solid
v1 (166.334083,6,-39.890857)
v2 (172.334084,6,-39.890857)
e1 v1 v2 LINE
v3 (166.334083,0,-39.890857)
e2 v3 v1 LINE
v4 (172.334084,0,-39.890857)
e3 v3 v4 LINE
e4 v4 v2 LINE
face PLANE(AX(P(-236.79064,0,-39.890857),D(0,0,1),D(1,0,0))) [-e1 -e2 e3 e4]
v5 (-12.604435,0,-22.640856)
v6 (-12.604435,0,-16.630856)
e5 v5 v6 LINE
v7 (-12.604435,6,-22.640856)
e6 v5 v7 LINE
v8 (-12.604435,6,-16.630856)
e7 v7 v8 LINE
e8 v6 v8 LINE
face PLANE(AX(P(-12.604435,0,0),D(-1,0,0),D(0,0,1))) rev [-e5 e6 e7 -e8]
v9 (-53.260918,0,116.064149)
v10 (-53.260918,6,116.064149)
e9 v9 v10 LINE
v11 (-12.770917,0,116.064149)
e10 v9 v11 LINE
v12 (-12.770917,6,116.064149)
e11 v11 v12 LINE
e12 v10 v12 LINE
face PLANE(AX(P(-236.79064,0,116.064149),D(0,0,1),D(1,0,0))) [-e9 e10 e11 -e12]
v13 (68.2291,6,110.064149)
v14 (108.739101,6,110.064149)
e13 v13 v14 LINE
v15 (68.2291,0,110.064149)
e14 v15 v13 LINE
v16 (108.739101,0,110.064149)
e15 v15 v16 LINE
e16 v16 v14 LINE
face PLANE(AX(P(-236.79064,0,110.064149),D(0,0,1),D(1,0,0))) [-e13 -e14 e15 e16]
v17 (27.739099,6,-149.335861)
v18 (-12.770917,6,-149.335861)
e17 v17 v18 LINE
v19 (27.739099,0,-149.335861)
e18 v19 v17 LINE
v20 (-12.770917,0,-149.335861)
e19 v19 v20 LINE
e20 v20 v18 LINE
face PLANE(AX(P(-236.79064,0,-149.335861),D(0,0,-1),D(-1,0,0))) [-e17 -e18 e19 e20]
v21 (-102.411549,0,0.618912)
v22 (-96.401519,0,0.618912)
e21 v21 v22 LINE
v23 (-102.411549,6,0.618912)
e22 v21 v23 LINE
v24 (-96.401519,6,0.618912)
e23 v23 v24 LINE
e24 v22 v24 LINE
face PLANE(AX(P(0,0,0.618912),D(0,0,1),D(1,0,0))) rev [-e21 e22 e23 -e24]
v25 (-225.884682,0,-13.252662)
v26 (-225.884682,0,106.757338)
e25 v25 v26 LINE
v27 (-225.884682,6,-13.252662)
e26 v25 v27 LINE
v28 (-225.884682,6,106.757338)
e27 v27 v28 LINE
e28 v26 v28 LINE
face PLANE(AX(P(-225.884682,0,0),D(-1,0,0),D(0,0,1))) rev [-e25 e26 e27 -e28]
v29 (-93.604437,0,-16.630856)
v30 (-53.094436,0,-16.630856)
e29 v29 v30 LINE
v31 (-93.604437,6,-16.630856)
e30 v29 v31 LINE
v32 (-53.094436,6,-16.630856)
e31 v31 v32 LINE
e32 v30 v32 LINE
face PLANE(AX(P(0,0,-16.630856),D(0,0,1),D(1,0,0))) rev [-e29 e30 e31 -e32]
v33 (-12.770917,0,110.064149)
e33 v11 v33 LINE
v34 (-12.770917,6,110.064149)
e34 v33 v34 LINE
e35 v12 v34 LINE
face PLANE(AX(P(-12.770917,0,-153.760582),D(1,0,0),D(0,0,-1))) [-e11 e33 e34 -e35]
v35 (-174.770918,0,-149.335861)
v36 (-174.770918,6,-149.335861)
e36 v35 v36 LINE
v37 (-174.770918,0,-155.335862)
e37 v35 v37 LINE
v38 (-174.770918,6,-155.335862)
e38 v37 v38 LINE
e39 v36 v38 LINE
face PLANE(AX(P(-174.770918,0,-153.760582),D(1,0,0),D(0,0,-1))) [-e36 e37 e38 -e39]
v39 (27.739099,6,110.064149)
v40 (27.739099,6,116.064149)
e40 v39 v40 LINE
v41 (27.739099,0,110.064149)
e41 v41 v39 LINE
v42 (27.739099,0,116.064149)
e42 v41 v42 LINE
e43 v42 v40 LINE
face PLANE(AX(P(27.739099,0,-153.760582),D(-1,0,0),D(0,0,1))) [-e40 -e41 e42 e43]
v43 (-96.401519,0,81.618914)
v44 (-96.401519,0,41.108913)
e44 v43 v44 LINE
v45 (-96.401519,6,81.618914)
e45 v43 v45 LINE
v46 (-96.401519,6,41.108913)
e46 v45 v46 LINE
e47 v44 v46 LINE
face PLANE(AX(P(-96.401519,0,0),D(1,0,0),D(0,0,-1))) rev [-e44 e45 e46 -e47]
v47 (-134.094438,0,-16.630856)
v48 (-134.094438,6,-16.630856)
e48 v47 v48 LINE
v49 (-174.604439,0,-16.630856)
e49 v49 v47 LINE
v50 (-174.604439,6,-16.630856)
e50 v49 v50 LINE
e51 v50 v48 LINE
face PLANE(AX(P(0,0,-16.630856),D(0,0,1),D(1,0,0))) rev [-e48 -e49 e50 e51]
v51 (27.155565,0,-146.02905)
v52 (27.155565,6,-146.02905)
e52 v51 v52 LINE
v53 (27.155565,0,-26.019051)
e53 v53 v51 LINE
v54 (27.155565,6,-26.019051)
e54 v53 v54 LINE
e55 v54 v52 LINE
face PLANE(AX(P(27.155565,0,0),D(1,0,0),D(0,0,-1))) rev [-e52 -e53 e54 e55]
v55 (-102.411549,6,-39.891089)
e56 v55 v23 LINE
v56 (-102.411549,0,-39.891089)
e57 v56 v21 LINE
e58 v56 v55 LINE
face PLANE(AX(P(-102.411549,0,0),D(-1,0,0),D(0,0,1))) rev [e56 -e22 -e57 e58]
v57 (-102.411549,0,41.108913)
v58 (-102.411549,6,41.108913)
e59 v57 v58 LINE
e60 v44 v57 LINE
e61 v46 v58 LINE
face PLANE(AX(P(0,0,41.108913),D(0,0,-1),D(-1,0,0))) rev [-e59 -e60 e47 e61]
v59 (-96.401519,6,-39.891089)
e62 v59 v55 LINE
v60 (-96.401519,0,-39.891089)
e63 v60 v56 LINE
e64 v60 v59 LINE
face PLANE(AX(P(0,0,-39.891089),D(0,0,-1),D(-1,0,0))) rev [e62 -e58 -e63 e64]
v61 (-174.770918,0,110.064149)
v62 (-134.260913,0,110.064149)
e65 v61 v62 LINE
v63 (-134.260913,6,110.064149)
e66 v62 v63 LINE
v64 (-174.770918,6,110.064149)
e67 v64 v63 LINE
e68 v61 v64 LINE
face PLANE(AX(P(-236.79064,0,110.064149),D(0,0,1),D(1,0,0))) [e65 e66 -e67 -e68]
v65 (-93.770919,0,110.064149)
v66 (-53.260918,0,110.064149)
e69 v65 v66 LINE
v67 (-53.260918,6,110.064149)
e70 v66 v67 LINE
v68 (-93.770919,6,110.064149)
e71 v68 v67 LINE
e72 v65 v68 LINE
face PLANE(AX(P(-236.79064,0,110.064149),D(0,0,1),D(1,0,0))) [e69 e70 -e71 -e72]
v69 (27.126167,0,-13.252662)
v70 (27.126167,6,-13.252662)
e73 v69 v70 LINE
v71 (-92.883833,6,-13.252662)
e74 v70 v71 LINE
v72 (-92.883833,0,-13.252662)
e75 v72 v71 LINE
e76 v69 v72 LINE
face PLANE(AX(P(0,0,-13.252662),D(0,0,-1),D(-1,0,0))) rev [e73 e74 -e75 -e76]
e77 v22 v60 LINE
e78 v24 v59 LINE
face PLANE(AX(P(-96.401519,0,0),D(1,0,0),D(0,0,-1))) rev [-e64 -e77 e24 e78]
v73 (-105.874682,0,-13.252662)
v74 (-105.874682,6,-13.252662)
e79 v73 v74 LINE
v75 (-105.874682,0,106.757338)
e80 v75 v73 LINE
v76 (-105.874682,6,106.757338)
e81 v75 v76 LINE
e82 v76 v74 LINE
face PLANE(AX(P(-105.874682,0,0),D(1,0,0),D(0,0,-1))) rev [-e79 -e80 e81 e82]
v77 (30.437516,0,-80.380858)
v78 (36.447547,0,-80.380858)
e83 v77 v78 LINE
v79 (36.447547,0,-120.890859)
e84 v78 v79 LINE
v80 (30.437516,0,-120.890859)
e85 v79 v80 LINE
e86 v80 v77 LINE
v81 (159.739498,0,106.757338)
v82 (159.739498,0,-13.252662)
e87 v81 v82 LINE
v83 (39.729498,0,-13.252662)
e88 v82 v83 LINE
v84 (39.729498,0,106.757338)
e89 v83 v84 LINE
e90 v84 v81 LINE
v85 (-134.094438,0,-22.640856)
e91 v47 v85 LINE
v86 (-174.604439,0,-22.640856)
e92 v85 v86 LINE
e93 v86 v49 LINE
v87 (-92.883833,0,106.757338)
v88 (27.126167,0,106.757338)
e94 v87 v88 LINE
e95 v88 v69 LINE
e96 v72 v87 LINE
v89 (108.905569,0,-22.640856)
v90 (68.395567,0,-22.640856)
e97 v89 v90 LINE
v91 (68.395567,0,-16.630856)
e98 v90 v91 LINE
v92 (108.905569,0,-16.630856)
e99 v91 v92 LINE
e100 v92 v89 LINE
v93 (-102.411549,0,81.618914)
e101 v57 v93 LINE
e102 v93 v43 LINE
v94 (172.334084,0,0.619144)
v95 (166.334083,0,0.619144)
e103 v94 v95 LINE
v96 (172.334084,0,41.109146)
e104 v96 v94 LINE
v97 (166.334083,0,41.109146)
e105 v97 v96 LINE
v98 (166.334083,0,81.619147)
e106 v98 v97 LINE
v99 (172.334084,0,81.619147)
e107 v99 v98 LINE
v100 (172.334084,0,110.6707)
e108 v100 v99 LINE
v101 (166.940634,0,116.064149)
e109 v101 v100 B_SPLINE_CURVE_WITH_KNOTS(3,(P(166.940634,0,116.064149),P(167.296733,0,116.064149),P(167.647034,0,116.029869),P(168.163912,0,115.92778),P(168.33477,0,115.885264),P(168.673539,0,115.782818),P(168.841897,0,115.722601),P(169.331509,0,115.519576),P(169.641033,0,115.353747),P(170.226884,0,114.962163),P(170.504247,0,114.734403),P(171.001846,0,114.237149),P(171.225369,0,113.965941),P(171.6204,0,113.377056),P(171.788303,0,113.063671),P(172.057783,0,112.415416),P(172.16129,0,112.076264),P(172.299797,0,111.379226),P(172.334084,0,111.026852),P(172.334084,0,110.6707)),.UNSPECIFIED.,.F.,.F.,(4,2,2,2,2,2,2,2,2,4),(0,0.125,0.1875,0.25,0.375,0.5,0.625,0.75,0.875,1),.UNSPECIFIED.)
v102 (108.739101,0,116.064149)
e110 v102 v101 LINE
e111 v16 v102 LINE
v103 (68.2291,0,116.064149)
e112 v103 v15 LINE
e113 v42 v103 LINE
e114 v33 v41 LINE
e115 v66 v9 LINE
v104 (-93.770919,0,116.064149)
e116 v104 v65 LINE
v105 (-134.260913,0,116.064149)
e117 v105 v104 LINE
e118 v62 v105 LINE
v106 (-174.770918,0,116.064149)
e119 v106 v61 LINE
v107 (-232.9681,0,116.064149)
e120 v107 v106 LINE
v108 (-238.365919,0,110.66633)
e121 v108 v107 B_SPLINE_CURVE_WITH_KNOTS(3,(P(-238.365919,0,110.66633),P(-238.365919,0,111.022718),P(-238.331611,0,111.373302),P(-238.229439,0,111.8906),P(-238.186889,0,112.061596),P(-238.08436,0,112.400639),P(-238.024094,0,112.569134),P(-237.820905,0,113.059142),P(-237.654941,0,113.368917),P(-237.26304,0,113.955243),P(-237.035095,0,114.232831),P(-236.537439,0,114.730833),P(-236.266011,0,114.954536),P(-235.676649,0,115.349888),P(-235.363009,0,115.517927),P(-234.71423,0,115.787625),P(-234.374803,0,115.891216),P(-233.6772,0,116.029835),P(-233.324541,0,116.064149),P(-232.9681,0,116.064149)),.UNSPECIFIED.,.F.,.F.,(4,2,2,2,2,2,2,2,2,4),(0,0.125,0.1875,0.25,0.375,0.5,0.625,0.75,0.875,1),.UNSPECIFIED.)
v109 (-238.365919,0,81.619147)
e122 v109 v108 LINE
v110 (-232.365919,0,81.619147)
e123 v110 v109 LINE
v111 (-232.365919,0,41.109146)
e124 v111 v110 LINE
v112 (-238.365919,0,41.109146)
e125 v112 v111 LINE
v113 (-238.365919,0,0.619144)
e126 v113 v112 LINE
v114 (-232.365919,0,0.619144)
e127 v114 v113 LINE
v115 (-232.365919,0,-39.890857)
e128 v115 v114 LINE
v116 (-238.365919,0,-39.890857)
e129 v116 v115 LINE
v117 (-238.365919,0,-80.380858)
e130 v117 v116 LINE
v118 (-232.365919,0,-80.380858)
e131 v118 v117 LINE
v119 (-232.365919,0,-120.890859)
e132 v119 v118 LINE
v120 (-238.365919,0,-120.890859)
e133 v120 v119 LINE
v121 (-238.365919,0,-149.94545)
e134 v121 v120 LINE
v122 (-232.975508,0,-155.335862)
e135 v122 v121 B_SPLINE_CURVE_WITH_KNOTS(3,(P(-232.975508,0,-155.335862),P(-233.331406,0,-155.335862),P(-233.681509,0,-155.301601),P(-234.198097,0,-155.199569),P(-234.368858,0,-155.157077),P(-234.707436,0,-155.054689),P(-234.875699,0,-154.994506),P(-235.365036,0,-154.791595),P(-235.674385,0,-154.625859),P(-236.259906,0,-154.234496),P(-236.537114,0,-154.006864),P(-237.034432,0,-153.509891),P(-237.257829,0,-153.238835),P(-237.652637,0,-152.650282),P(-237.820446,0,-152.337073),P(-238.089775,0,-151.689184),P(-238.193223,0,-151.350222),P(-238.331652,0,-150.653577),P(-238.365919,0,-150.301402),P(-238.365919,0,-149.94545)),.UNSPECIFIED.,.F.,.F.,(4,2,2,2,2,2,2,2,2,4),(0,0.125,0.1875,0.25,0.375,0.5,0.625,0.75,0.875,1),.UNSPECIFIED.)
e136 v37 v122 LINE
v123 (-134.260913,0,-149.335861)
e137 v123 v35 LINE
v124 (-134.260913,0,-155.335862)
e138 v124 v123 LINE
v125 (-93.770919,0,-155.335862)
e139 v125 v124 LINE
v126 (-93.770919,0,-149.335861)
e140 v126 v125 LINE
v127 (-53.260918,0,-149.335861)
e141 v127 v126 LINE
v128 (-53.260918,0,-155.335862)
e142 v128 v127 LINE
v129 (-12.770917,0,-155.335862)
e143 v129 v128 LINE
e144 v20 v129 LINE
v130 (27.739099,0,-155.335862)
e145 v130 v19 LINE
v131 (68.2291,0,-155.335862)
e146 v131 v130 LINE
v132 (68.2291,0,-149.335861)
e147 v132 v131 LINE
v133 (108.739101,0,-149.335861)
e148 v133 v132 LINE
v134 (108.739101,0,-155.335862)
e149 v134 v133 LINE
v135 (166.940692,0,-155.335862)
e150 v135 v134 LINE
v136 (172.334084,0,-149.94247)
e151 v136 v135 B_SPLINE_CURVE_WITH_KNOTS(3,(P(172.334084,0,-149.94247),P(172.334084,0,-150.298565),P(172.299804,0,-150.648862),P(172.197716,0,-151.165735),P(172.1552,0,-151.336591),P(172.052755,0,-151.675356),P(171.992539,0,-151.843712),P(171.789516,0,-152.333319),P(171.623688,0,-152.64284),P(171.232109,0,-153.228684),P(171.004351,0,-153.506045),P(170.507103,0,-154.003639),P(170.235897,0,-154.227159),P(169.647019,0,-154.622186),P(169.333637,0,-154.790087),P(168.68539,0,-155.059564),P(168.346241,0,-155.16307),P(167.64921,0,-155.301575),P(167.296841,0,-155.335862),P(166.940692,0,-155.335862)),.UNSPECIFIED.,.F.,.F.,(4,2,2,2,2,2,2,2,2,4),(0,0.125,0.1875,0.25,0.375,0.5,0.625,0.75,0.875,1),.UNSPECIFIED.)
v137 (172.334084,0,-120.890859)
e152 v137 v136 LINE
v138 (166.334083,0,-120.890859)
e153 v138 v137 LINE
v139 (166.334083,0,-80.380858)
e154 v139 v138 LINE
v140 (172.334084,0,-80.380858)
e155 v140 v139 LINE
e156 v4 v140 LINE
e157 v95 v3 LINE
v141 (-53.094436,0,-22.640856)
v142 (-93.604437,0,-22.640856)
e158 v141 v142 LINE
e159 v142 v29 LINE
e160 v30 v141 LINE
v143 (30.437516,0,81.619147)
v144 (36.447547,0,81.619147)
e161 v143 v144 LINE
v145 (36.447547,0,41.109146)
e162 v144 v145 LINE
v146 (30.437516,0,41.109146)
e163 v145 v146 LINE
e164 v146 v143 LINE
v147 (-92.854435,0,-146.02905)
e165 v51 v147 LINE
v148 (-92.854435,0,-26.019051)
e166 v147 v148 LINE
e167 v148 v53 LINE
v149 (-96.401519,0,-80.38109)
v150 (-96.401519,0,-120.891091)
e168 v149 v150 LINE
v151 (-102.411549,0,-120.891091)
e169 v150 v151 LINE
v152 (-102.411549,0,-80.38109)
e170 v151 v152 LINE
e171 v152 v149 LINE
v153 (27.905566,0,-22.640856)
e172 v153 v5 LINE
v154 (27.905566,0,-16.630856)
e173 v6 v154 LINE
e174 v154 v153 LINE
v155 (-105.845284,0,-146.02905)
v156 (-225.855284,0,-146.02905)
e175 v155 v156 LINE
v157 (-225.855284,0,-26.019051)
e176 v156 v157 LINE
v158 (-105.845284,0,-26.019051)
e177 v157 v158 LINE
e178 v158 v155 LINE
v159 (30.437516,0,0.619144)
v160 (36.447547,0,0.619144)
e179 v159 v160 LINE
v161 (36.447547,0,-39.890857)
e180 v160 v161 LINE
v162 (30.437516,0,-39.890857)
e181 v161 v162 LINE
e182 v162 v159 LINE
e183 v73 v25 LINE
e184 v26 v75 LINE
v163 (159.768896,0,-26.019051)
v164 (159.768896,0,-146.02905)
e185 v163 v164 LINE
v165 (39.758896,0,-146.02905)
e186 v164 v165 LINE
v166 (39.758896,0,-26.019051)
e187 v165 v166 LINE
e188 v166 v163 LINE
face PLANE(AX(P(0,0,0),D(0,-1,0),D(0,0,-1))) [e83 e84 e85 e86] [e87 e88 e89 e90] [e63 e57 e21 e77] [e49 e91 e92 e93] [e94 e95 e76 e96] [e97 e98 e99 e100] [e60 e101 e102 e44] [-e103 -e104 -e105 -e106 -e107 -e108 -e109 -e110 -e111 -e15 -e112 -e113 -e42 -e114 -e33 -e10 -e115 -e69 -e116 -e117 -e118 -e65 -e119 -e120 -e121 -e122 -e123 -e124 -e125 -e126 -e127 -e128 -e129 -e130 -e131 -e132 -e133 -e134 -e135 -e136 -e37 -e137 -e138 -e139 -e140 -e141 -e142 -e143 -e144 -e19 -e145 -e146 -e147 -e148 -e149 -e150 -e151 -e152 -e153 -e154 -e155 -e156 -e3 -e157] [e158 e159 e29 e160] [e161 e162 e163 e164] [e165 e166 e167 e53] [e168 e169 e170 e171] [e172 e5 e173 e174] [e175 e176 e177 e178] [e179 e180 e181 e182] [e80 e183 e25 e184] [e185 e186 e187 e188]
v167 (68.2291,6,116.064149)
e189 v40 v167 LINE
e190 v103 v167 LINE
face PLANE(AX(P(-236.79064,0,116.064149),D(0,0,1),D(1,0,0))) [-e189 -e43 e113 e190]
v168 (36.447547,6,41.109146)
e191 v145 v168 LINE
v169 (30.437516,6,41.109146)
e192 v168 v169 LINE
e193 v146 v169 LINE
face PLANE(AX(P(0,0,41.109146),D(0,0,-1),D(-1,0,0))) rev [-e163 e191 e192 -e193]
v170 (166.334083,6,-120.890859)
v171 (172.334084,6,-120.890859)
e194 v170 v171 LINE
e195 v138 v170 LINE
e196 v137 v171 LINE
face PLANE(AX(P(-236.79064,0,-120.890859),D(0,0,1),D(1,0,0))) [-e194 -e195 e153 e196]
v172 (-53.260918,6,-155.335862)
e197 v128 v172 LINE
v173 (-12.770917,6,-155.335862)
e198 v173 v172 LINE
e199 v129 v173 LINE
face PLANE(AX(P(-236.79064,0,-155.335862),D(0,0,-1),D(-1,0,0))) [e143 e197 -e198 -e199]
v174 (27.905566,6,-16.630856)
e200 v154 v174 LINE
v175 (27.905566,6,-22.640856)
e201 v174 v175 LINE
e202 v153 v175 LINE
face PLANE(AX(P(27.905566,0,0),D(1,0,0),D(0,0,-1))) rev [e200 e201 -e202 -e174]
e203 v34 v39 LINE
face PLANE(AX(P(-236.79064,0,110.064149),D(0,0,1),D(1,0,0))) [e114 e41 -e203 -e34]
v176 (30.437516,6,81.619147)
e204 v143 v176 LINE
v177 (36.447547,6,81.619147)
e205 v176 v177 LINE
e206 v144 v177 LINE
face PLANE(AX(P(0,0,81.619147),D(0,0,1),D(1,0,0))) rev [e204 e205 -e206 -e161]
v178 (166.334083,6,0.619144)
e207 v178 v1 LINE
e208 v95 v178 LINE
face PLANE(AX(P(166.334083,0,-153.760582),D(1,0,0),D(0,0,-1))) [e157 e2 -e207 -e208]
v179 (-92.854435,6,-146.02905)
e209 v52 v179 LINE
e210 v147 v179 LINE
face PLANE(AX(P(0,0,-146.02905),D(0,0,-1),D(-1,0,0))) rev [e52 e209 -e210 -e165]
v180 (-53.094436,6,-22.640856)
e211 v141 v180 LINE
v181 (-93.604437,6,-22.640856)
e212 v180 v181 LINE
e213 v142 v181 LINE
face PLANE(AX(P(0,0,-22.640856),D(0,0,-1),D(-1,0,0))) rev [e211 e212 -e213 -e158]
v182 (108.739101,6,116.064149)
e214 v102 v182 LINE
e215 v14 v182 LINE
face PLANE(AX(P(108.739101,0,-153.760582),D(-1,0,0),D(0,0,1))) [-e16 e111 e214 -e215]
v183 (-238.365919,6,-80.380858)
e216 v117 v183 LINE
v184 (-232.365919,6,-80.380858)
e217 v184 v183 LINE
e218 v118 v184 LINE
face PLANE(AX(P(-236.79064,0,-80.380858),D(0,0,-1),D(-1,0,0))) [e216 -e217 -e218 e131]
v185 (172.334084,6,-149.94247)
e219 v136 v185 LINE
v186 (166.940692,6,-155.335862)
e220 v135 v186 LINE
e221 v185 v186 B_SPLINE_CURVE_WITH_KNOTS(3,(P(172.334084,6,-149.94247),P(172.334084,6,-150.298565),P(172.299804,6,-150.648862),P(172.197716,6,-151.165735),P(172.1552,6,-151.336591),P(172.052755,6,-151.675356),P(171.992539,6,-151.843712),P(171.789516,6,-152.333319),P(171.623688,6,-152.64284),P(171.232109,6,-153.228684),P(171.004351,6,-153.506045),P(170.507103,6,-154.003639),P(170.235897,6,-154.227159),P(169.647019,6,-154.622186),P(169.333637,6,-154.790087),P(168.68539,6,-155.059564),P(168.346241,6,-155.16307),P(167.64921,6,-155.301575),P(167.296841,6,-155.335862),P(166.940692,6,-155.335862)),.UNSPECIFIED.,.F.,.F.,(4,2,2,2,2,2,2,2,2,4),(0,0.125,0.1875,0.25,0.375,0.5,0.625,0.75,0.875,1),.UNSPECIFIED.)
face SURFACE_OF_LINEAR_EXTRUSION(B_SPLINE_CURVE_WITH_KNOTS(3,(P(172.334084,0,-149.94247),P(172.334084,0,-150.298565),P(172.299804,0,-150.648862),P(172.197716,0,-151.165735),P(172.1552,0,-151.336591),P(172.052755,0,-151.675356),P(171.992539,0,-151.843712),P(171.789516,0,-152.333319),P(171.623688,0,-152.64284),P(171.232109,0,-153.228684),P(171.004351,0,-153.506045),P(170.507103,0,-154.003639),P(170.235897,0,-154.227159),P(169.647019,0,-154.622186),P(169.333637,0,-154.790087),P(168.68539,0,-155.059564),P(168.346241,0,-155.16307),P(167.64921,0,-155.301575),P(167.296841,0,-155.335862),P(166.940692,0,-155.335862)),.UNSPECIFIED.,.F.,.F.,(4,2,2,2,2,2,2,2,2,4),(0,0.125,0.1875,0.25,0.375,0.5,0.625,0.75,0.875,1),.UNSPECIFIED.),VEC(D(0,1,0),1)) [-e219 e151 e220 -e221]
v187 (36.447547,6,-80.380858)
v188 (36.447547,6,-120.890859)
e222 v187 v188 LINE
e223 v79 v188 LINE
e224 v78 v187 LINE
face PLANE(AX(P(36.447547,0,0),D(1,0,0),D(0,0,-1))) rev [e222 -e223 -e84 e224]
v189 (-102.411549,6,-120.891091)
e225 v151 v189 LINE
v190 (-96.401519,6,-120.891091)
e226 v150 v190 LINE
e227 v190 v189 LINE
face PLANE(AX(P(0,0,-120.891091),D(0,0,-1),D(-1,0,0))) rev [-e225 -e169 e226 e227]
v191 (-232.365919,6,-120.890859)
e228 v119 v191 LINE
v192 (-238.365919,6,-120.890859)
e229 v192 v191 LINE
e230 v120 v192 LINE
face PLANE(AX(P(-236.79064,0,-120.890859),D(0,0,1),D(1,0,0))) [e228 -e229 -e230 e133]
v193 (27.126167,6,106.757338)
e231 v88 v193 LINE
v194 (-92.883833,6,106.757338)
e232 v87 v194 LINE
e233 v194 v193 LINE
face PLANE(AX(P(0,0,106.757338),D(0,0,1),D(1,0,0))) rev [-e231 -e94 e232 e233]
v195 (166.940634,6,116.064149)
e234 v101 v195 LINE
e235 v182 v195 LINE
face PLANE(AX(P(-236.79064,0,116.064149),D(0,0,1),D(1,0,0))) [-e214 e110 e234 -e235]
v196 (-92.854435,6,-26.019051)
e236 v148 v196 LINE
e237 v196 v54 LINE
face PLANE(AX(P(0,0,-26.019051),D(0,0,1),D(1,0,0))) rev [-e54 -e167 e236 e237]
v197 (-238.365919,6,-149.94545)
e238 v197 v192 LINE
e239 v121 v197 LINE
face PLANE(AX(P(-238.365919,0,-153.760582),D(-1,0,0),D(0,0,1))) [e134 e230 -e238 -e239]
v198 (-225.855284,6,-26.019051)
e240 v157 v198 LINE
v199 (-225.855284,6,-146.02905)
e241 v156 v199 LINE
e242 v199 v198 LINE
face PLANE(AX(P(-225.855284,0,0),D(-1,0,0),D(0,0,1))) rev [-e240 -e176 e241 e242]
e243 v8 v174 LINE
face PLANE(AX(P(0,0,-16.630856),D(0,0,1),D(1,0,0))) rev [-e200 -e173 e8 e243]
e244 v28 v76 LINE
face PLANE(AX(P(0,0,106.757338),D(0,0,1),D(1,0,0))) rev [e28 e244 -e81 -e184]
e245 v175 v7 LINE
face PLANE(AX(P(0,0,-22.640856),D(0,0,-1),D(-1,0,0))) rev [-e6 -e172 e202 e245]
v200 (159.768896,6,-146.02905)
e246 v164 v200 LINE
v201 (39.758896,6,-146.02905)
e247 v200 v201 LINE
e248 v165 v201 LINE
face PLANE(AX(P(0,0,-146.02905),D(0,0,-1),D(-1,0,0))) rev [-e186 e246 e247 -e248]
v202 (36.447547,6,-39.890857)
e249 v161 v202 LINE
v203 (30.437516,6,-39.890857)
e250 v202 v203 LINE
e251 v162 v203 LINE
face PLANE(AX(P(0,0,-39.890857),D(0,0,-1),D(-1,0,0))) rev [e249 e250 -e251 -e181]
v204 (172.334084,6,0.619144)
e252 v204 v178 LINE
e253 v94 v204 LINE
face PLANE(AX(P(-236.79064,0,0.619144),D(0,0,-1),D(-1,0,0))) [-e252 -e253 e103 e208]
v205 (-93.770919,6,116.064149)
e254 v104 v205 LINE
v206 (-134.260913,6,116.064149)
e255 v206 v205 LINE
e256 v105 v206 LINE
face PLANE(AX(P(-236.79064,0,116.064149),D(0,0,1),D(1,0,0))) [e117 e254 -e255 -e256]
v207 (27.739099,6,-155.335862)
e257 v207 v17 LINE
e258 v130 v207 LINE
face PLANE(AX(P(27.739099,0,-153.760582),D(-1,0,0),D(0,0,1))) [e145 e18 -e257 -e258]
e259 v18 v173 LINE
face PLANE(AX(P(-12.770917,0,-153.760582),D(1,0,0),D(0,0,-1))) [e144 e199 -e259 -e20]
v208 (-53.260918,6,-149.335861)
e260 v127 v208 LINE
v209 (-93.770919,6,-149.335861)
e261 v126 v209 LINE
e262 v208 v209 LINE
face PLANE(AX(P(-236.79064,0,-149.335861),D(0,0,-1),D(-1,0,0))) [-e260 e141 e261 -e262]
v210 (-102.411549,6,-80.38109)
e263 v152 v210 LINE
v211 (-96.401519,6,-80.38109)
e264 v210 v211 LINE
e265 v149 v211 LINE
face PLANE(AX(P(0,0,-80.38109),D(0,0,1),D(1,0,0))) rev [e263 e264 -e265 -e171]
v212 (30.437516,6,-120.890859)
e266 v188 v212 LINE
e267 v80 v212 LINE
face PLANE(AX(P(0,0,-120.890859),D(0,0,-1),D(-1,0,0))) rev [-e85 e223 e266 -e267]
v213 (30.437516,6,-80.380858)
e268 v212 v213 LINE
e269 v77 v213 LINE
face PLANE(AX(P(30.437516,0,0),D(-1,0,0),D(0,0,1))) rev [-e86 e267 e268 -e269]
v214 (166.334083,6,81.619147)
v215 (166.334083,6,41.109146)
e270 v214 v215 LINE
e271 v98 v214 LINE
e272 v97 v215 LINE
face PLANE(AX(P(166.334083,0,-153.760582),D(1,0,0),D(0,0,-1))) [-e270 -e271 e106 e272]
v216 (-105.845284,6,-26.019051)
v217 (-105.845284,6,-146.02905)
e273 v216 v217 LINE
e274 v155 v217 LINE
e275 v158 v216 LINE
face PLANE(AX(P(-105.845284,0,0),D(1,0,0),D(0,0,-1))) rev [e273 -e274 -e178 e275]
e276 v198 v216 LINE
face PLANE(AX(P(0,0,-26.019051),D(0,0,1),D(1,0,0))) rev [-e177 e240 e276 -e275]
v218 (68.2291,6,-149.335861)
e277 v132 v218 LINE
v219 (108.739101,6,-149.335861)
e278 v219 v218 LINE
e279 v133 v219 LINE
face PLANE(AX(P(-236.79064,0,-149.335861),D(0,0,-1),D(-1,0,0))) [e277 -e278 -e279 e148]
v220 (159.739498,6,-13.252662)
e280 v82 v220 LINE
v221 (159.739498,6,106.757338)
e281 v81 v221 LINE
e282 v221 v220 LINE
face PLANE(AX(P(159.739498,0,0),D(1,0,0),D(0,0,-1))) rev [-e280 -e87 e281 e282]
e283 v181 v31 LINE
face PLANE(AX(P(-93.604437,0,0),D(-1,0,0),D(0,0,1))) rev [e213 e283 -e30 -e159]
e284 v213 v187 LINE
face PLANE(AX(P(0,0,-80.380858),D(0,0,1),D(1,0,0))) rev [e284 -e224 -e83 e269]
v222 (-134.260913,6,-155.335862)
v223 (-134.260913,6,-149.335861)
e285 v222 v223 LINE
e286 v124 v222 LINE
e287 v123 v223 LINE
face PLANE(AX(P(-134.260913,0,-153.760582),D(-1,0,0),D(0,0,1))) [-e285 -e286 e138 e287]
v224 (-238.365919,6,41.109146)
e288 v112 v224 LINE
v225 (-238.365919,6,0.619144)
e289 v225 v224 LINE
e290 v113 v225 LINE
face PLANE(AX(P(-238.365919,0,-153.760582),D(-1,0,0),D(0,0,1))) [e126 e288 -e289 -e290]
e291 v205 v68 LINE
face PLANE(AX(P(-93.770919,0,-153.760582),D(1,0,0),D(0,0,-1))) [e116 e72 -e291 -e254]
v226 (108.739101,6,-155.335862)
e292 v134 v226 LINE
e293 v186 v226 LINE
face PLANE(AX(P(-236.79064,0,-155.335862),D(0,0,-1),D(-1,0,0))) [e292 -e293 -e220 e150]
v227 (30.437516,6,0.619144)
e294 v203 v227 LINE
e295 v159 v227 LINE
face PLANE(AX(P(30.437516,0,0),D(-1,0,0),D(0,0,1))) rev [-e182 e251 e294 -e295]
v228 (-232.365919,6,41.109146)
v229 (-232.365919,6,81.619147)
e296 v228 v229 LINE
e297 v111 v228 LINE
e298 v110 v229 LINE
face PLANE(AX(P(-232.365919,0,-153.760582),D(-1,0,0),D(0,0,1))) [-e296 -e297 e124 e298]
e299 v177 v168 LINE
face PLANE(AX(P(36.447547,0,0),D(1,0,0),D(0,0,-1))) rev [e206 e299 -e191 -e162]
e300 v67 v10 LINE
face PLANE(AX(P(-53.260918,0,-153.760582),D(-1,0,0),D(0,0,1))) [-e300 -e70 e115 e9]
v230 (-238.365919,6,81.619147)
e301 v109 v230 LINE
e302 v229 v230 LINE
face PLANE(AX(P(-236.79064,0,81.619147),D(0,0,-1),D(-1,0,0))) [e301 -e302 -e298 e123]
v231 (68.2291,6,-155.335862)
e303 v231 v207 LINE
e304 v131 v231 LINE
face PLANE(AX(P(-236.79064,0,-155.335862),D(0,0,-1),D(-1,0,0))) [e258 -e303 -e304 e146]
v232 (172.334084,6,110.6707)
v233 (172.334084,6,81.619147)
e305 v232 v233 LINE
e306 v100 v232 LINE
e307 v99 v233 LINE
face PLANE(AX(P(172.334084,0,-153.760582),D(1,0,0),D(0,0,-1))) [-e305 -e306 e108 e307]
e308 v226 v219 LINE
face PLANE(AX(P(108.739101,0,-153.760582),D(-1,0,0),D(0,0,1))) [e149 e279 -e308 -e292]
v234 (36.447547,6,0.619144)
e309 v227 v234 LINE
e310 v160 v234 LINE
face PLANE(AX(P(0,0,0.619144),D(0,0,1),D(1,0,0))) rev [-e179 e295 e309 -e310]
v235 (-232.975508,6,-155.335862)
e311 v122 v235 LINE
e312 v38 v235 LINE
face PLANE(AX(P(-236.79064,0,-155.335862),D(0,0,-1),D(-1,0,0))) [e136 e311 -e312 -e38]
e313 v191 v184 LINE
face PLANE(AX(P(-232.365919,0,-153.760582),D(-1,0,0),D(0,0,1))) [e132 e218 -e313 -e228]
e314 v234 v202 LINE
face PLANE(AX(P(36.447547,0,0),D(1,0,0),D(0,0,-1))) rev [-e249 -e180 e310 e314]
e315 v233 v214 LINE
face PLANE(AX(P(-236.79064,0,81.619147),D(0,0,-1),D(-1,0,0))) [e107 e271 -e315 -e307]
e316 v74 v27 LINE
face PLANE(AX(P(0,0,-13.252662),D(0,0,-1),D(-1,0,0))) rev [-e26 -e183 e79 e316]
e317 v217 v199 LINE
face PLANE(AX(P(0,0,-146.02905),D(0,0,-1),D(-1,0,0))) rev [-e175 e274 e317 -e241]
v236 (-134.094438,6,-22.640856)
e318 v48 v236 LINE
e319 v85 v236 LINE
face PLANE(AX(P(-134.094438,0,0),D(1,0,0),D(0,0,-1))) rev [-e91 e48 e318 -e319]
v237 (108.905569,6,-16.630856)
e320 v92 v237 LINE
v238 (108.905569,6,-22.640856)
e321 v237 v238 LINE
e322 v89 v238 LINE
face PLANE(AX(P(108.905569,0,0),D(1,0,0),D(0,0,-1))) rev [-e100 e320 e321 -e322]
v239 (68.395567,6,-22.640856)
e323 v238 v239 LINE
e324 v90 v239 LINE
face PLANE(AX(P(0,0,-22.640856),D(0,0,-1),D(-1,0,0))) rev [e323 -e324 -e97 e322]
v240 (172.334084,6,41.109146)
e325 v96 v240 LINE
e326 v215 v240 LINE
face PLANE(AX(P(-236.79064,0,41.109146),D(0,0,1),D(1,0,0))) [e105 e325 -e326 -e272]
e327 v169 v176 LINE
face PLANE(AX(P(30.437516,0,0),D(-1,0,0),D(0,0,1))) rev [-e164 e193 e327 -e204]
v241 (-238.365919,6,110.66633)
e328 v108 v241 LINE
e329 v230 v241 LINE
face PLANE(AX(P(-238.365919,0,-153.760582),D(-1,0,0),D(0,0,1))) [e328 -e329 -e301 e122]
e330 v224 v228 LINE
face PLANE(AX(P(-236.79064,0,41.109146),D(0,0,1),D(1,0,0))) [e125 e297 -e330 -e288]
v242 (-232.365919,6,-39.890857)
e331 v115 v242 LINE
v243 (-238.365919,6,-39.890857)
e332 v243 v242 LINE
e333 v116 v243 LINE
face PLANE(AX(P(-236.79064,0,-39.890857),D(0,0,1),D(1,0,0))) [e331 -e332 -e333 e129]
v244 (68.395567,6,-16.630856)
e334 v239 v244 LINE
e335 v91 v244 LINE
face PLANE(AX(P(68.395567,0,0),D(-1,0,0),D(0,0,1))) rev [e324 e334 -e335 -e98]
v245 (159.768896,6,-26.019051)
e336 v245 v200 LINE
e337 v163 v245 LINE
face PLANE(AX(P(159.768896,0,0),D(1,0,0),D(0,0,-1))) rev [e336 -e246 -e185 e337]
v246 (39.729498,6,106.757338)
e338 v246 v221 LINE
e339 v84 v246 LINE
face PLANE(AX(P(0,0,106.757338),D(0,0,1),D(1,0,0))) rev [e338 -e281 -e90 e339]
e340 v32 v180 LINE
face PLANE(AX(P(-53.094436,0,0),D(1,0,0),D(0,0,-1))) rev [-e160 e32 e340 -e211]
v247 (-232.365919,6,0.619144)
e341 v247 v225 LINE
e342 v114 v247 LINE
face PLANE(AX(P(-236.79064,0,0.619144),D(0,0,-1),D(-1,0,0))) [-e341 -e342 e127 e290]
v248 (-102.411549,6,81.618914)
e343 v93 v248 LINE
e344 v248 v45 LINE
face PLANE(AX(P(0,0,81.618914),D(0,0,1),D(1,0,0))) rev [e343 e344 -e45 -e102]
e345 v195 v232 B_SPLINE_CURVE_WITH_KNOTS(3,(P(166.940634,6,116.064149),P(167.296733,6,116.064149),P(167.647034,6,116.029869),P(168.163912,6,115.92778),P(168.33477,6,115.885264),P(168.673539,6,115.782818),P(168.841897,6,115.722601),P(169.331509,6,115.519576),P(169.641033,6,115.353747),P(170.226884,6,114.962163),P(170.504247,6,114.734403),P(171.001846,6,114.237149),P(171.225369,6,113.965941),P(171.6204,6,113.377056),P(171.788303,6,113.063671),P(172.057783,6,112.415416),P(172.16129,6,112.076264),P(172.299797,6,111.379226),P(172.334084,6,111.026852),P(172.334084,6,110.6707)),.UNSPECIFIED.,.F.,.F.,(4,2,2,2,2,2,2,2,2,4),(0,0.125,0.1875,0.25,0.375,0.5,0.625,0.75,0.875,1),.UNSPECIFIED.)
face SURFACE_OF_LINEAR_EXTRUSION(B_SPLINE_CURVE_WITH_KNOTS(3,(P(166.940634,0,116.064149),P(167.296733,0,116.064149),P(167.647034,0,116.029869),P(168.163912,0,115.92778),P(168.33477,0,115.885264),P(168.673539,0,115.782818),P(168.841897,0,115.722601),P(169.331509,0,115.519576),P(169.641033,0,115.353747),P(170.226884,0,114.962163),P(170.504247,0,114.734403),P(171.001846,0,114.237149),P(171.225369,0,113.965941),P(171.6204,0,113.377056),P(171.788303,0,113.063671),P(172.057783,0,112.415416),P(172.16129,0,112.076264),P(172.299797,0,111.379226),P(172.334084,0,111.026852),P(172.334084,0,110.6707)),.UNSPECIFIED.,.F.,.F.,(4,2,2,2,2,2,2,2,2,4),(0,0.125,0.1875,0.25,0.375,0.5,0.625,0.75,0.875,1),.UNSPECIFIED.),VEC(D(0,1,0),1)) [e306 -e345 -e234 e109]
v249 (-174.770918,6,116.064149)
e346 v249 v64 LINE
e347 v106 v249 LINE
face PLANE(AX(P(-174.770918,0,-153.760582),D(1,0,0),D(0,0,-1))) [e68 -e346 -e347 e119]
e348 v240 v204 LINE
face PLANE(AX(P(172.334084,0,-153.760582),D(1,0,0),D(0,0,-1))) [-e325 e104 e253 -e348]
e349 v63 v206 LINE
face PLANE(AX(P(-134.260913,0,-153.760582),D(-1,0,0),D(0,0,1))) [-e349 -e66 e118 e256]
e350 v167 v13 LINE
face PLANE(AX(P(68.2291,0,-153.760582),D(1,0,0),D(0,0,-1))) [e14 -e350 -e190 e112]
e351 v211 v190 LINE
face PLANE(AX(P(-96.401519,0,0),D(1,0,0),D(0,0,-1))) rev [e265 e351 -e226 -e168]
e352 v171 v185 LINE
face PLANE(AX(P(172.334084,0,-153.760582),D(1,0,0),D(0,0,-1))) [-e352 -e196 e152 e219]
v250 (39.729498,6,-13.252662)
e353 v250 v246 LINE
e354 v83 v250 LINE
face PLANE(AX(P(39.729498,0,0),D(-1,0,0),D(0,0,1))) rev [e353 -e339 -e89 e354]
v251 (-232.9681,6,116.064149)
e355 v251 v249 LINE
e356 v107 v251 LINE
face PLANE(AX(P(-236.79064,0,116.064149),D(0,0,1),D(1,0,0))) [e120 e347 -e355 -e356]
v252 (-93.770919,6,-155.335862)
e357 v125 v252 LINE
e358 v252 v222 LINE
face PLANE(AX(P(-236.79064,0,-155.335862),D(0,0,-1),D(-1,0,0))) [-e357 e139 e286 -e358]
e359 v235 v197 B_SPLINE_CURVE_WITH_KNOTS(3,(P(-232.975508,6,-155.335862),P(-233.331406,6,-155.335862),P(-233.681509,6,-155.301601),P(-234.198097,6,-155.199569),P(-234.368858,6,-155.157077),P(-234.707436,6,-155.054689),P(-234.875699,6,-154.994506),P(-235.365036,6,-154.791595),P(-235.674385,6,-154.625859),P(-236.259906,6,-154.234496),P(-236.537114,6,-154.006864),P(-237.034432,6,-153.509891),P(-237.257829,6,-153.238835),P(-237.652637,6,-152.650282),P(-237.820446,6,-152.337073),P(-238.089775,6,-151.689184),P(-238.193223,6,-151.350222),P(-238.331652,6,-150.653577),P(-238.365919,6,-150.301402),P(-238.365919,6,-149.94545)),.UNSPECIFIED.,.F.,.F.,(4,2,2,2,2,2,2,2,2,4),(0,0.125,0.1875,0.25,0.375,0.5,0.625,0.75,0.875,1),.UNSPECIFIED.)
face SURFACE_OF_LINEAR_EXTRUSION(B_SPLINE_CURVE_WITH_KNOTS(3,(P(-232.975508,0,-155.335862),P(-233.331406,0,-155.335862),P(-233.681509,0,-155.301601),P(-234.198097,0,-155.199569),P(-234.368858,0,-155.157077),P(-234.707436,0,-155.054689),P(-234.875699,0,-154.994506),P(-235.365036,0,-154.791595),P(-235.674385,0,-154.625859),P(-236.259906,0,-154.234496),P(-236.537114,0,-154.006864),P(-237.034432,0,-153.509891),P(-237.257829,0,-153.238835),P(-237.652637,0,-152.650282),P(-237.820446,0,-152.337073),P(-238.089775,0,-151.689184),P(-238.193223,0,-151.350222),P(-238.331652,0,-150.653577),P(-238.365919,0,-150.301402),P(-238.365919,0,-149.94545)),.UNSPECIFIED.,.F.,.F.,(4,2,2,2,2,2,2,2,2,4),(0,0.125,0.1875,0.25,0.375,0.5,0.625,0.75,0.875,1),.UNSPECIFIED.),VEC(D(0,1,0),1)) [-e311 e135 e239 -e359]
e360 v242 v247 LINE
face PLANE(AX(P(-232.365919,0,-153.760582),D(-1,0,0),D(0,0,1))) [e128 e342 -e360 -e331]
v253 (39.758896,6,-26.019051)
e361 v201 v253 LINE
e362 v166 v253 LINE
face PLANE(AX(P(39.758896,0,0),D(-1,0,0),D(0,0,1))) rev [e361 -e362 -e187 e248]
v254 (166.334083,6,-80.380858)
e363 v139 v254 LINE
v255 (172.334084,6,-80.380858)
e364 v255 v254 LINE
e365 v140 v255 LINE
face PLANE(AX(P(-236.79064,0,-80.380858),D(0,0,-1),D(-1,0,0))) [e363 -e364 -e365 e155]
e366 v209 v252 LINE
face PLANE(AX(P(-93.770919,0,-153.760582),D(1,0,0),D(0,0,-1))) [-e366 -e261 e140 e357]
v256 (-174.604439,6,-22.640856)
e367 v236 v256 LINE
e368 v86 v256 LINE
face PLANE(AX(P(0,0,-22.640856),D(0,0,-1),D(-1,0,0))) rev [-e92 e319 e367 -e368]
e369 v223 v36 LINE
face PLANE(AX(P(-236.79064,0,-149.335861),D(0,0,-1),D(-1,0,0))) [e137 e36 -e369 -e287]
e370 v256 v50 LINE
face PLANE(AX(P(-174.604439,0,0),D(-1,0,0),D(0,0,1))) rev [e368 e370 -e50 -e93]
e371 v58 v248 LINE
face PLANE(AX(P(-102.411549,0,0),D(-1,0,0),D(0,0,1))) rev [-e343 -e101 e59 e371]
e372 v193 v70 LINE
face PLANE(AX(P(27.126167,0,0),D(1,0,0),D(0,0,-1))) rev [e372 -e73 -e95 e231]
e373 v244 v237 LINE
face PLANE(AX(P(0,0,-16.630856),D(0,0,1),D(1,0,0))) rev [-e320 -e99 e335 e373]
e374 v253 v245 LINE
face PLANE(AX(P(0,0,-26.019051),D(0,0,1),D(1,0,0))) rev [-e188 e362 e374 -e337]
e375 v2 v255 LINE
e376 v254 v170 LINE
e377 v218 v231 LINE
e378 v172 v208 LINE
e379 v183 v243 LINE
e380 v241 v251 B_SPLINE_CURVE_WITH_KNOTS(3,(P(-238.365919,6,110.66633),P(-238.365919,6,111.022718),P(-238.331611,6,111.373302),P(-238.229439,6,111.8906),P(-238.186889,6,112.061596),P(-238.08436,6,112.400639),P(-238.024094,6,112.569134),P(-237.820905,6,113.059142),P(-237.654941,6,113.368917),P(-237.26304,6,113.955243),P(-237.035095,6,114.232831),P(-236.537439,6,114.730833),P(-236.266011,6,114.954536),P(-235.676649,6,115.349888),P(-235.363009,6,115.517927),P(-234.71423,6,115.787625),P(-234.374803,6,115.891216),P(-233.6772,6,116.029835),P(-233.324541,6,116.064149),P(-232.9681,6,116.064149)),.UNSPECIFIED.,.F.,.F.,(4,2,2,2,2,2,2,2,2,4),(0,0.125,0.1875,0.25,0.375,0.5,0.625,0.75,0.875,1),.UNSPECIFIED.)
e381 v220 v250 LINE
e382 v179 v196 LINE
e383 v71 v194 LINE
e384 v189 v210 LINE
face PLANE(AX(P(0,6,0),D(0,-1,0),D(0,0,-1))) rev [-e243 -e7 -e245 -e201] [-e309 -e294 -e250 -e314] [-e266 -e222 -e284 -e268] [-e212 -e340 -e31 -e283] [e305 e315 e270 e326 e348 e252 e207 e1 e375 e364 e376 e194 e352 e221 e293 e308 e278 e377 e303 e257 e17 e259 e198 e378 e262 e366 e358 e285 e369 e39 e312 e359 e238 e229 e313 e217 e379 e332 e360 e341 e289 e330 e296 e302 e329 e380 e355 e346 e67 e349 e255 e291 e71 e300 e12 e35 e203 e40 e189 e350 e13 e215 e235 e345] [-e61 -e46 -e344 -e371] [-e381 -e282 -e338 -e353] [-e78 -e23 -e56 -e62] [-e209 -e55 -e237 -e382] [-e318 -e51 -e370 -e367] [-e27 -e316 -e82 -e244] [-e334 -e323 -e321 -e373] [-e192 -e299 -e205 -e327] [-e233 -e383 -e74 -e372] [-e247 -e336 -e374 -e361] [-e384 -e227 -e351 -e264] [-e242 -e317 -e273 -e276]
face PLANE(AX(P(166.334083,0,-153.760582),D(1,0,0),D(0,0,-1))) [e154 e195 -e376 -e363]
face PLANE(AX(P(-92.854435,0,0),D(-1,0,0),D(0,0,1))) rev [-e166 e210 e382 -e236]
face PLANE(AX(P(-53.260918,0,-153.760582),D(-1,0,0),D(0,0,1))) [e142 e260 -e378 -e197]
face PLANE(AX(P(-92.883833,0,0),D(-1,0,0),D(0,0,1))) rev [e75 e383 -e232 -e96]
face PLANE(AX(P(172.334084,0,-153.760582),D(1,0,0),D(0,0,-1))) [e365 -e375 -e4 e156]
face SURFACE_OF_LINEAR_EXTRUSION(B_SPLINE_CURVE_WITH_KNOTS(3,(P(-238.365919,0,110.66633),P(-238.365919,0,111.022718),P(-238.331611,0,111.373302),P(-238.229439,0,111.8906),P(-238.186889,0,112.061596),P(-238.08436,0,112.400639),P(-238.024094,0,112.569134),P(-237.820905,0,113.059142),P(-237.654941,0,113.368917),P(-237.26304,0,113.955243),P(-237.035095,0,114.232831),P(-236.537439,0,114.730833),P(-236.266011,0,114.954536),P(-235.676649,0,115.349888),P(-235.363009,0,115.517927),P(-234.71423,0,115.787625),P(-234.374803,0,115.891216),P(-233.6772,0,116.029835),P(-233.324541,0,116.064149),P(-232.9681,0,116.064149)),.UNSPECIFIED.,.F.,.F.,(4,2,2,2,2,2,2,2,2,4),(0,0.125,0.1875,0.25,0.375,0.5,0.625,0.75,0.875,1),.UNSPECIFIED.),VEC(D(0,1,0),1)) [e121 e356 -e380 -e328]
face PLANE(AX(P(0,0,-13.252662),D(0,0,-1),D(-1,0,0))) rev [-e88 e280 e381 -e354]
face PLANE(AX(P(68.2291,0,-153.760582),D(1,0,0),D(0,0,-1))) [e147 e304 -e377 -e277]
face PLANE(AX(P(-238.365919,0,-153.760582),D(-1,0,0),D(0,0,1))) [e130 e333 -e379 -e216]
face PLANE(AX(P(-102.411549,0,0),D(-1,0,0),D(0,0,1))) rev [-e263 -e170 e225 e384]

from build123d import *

# Parameters (mm, degrees)
SKETCH1_W                     = 600
SKETCH1_H                     = 400
BOSS_EXTRUDE1_DEPTH           = 6
CUT_EXTRUDE_THIN1_START       = -6
CUT_EXTRUDE_THIN1_OUTLINE_W   = 600
CUT_EXTRUDE_THIN1_OUTLINE_H   = 400
CUT_EXTRUDE_THIN1_OUTLINE_W_2 = 120.00999997
CUT_EXTRUDE_THIN1_OUTLINE_H_2 = 120.00999997
CUT_EXTRUDE_THIN1_OUTLINE_W_3 = 6.010030683
CUT_EXTRUDE_THIN1_OUTLINE_H_3 = 40.510001116
CUT_EXTRUDE_THIN1_OUTLINE_H_4 = 40.510001117
CUT_EXTRUDE_THIN1_OUTLINE_W_4 = 40.510001117
CUT_EXTRUDE_THIN1_OUTLINE_H_5 = 6.010000165
CUT_EXTRUDE_THIN1_OUTLINE_W_5 = 40.510001116
CUT_EXTRUDE_THIN1_DEPTH       = 6


# Read off the part's stored shape, not the designer's step: Cut-Extrude-Thin1
with BuildPart() as part:
    # Sketch1 → Boss-Extrude1 (new body)
    with BuildSketch(Plane(origin=(0, 0, 0), x_dir=(1, 0, 0), z_dir=(0, 1, 0))):
        Rectangle(SKETCH1_W, SKETCH1_H)
    extrude(amount=BOSS_EXTRUDE1_DEPTH)

    # Cut-Extrude-Thin1 outline → Cut-Extrude-Thin1 (cut)
    # profile 1 of 17: a face of its own
    with BuildSketch(Plane(origin=(0, 6, 0), x_dir=(1, 0, 0), z_dir=(0, 1, 0)).offset(CUT_EXTRUDE_THIN1_START)):
        Rectangle(CUT_EXTRUDE_THIN1_OUTLINE_W, CUT_EXTRUDE_THIN1_OUTLINE_H)
        with BuildLine():
            add(Edge.make_bspline(
                [(-238.36591917, -110.666330439), (-238.36591917, -111.022718254), (-238.331611138, -111.373302275), (-238.229439172, -111.890599849), (-238.186888618, -112.061595598), (-238.084359635, -112.40063887), (-238.024094249, -112.569133555), (-237.820904778, -113.059142484), (-237.654940907, -113.36891683), (-237.263040055, -113.955242515), (-237.035095444, -114.232830805), (-236.537438909, -114.730832851), (-236.266010557, -114.954536306), (-235.676648855, -115.349887512), (-235.363009478, -115.517926842), (-234.714230084, -115.787625448), (-234.374802575, -115.891216057), (-233.677199742, -116.029834842), (-233.324541074, -116.06414949), (-232.96810012, -116.06414949)],
                knots=[0, 0, 0, 0, 0.125, 0.125, 0.1875, 0.1875, 0.25, 0.25, 0.375, 0.375, 0.5, 0.5, 0.625, 0.625, 0.75, 0.75, 0.875, 0.875, 1, 1, 1, 1], degree=3))
            Line((-238.36591917, -110.666330439), (-238.36591917, -81.619146709))
            Line((-238.36591917, -81.619146709), (-232.365919004, -81.619146709))
            Line((-232.365919004, -81.619146709), (-232.365919004, -41.109145592))
            Line((-232.365919004, -41.109145592), (-238.36591917, -41.109145592))
            Line((-238.36591917, -41.109145592), (-238.36591917, -0.619144476))
            Line((-238.36591917, -0.619144476), (-232.365919004, -0.619144476))
            Line((-232.365919004, -0.619144476), (-232.365919004, 39.890856641))
            Line((-232.365919004, 39.890856641), (-238.36591917, 39.890856641))
            Line((-238.36591917, 39.890856641), (-238.36591917, 80.380857757))
            Line((-238.36591917, 80.380857757), (-232.365919004, 80.380857757))
            Line((-232.365919004, 80.380857757), (-232.365919004, 120.890858873))
            Line((-232.365919004, 120.890858873), (-238.36591917, 120.890858873))
            Line((-238.36591917, 120.890858873), (-238.36591917, 149.945450012))
            add(Edge.make_bspline(
                [(-232.975507527, 155.335861654), (-233.331406272, 155.335861654), (-233.681509188, 155.301600704), (-234.198096877, 155.199568948), (-234.368857969, 155.157076787), (-234.707435973, 155.054688504), (-234.875699433, 154.99450582), (-235.365035925, 154.791595185), (-235.674385168, 154.625859065), (-236.259906241, 154.234496016), (-236.537113597, 154.006864213), (-237.034432237, 153.50989061), (-237.257828705, 153.238834738), (-237.652637373, 152.650281815), (-237.820446103, 152.337072845), (-238.089774603, 151.689183769), (-238.193223055, 151.350222055), (-238.331651613, 150.653576539), (-238.36591917, 150.301401824), (-238.36591917, 149.945450012)],
                knots=[0, 0, 0, 0, 0.125, 0.125, 0.1875, 0.1875, 0.25, 0.25, 0.375, 0.375, 0.5, 0.5, 0.625, 0.625, 0.75, 0.75, 0.875, 0.875, 1, 1, 1, 1], degree=3))
            Line((-232.975507527, 155.335861654), (-174.770917874, 155.335861654))
            Line((-174.770917874, 155.335861654), (-174.770917874, 149.335861489))
            Line((-174.770917874, 149.335861489), (-134.260912943, 149.335861489))
            Line((-134.260912943, 149.335861489), (-134.260912943, 155.335861654))
            Line((-134.260912943, 155.335861654), (-93.770919456, 155.335861654))
            Line((-93.770919456, 155.335861654), (-93.770919456, 149.335861489))
            Line((-93.770919456, 149.335861489), (-53.26091834, 149.335861489))
            Line((-53.26091834, 149.335861489), (-53.26091834, 155.335861654))
            Line((-53.26091834, 155.335861654), (-12.770917223, 155.335861654))
            Line((-12.770917223, 155.335861654), (-12.770917223, 149.335861489))
            Line((-12.770917223, 149.335861489), (27.739099152, 149.335861489))
            Line((27.739099152, 149.335861489), (27.739099152, 155.335861654))
            Line((27.739099152, 155.335861654), (68.229100268, 155.335861654))
            Line((68.229100268, 155.335861654), (68.229100268, 149.335861489))
            Line((68.229100268, 149.335861489), (108.739101385, 149.335861489))
            Line((108.739101385, 149.335861489), (108.739101385, 155.335861654))
            Line((108.739101385, 155.335861654), (166.94069191, 155.335861654))
            add(Edge.make_bspline(
                [(172.334083607, 149.942469958), (172.334083607, 150.298565459), (172.299803715, 150.648861927), (172.197715552, 151.165735208), (172.155199899, 151.336590704), (172.052755011, 151.675355888), (171.992539056, 151.843712372), (171.789516243, 152.33331939), (171.623688497, 152.642839656), (171.232109086, 153.22868443), (171.004351438, 153.506045038), (170.507103087, 154.003638617), (170.235897363, 154.227158588), (169.647019062, 154.622185524), (169.333636936, 154.790087026), (168.685389679, 155.059564422), (168.346240572, 155.163070064), (167.649209921, 155.301575153), (167.296840508, 155.335861654), (166.94069191, 155.335861654)],
                knots=[0, 0, 0, 0, 0.125, 0.125, 0.1875, 0.1875, 0.25, 0.25, 0.375, 0.375, 0.5, 0.5, 0.625, 0.625, 0.75, 0.75, 0.875, 0.875, 1, 1, 1, 1], degree=3))
            Line((172.334083607, 149.942469958), (172.334083607, 120.890858873))
            Line((172.334083607, 120.890858873), (166.334083441, 120.890858873))
            Line((166.334083441, 120.890858873), (166.334083441, 80.380857757))
            Line((166.334083441, 80.380857757), (172.334083607, 80.380857757))
            Line((172.334083607, 80.380857757), (172.334083607, 39.890856641))
            Line((172.334083607, 39.890856641), (166.334083441, 39.890856641))
            Line((166.334083441, 39.890856641), (166.334083441, -0.619144476))
            Line((166.334083441, -0.619144476), (172.334083607, -0.619144476))
            Line((172.334083607, -0.619144476), (172.334083607, -41.109145592))
            Line((172.334083607, -41.109145592), (166.334083441, -41.109145592))
            Line((166.334083441, -41.109145592), (166.334083441, -81.619146709))
            Line((166.334083441, -81.619146709), (172.334083607, -81.619146709))
            Line((172.334083607, -81.619146709), (172.334083607, -110.670699923))
            add(Edge.make_bspline(
                [(166.94063404, -116.06414949), (167.296733362, -116.06414949), (167.647033588, -116.02986923), (168.163912416, -115.927779971), (168.334769745, -115.885263862), (168.673538564, -115.782817875), (168.841896854, -115.722601274), (169.331509126, -115.519576283), (169.641032712, -115.353746757), (170.226883772, -114.962163145), (170.504247357, -114.734403053), (171.001846275, -114.237149366), (171.225368645, -113.965940733), (171.620399819, -113.377056114), (171.788303122, -113.063670625), (172.05778341, -112.415416412), (172.161290163, -112.076263666), (172.299796737, -111.379225535), (172.334083607, -111.026852342), (172.334083607, -110.670699923)],
                knots=[0, 0, 0, 0, 0.125, 0.125, 0.1875, 0.1875, 0.25, 0.25, 0.375, 0.375, 0.5, 0.5, 0.625, 0.625, 0.75, 0.75, 0.875, 0.875, 1, 1, 1, 1], degree=3))
            Line((166.94063404, -116.06414949), (108.739101385, -116.06414949))
            Line((108.739101385, -116.06414949), (108.739101385, -110.064149324))
            Line((108.739101385, -110.064149324), (68.229100268, -110.064149324))
            Line((68.229100268, -110.064149324), (68.229100268, -116.06414949))
            Line((68.229100268, -116.06414949), (27.739099152, -116.06414949))
            Line((27.739099152, -116.06414949), (27.739099152, -110.064149324))
            Line((27.739099152, -110.064149324), (-12.770917223, -110.064149324))
            Line((-12.770917223, -110.064149324), (-12.770917223, -116.06414949))
            Line((-12.770917223, -116.06414949), (-53.26091834, -116.06414949))
            Line((-53.26091834, -116.06414949), (-53.26091834, -110.064149324))
            Line((-53.26091834, -110.064149324), (-93.770919456, -110.064149324))
            Line((-93.770919456, -110.064149324), (-93.770919456, -116.06414949))
            Line((-93.770919456, -116.06414949), (-134.260912943, -116.06414949))
            Line((-134.260912943, -116.06414949), (-134.260912943, -110.064149324))
            Line((-134.260912943, -110.064149324), (-174.770917874, -110.064149324))
            Line((-174.770917874, -110.064149324), (-174.770917874, -116.06414949))
            Line((-174.770917874, -116.06414949), (-232.96810012, -116.06414949))
        make_face(mode=Mode.SUBTRACT)
    # profile 2 of 17: a face of its own
    with BuildSketch(Plane(origin=(0, 6, 0), x_dir=(1, 0, 0), z_dir=(0, 1, 0)).offset(CUT_EXTRUDE_THIN1_START)):
        with Locations((99.734498143, -46.752338346)):
            Rectangle(CUT_EXTRUDE_THIN1_OUTLINE_W_2, CUT_EXTRUDE_THIN1_OUTLINE_H_2)
    # profile 3 of 17: a face of its own
    with BuildSketch(Plane(origin=(0, 6, 0), x_dir=(1, 0, 0), z_dir=(0, 1, 0)).offset(CUT_EXTRUDE_THIN1_START)):
        with Locations((-32.878833462, -46.752338346)):
            Rectangle(CUT_EXTRUDE_THIN1_OUTLINE_W_2, CUT_EXTRUDE_THIN1_OUTLINE_H_2)
    # profile 4 of 17: a face of its own
    with BuildSketch(Plane(origin=(0, 6, 0), x_dir=(1, 0, 0), z_dir=(0, 1, 0)).offset(CUT_EXTRUDE_THIN1_START)):
        with Locations((-165.879682281, -46.752338346)):
            Rectangle(CUT_EXTRUDE_THIN1_OUTLINE_W_2, CUT_EXTRUDE_THIN1_OUTLINE_H_2)
    # profile 5 of 17: a face of its own
    with BuildSketch(Plane(origin=(0, 6, 0), x_dir=(1, 0, 0), z_dir=(0, 1, 0)).offset(CUT_EXTRUDE_THIN1_START)):
        with Locations((33.442531415, 100.635858315)):
            Rectangle(CUT_EXTRUDE_THIN1_OUTLINE_W_3, CUT_EXTRUDE_THIN1_OUTLINE_H_3)
    # profile 6 of 17: a face of its own
    with BuildSketch(Plane(origin=(0, 6, 0), x_dir=(1, 0, 0), z_dir=(0, 1, 0)).offset(CUT_EXTRUDE_THIN1_START)):
        with Locations((33.442531415, 19.635856082)):
            Rectangle(CUT_EXTRUDE_THIN1_OUTLINE_W_3, CUT_EXTRUDE_THIN1_OUTLINE_H_4)
    # profile 7 of 17: a face of its own
    with BuildSketch(Plane(origin=(0, 6, 0), x_dir=(1, 0, 0), z_dir=(0, 1, 0)).offset(CUT_EXTRUDE_THIN1_START)):
        with Locations((33.442531415, -61.364146151)):
            Rectangle(CUT_EXTRUDE_THIN1_OUTLINE_W_3, CUT_EXTRUDE_THIN1_OUTLINE_H_4)
    # profile 8 of 17: a face of its own
    with BuildSketch(Plane(origin=(0, 6, 0), x_dir=(1, 0, 0), z_dir=(0, 1, 0)).offset(CUT_EXTRUDE_THIN1_START)):
        with Locations((-99.406534011, -61.363913878)):
            Rectangle(CUT_EXTRUDE_THIN1_OUTLINE_W_3, CUT_EXTRUDE_THIN1_OUTLINE_H_3)
    # profile 9 of 17: a face of its own
    with BuildSketch(Plane(origin=(0, 6, 0), x_dir=(1, 0, 0), z_dir=(0, 1, 0)).offset(CUT_EXTRUDE_THIN1_START)):
        with Locations((-99.406534011, 19.636088355)):
            Rectangle(CUT_EXTRUDE_THIN1_OUTLINE_W_3, CUT_EXTRUDE_THIN1_OUTLINE_H_3)
    # profile 10 of 17: a face of its own
    with BuildSketch(Plane(origin=(0, 6, 0), x_dir=(1, 0, 0), z_dir=(0, 1, 0)).offset(CUT_EXTRUDE_THIN1_START)):
        with Locations((-99.406534011, 100.636090588)):
            Rectangle(CUT_EXTRUDE_THIN1_OUTLINE_W_3, CUT_EXTRUDE_THIN1_OUTLINE_H_3)
    # profile 11 of 17: a face of its own
    with BuildSketch(Plane(origin=(0, 6, 0), x_dir=(1, 0, 0), z_dir=(0, 1, 0)).offset(CUT_EXTRUDE_THIN1_START)):
        with Locations((-73.349436431, 19.635856083)):
            Rectangle(CUT_EXTRUDE_THIN1_OUTLINE_W_4, CUT_EXTRUDE_THIN1_OUTLINE_H_5)
    # profile 12 of 17: a face of its own
    with BuildSketch(Plane(origin=(0, 6, 0), x_dir=(1, 0, 0), z_dir=(0, 1, 0)).offset(CUT_EXTRUDE_THIN1_START)):
        with Locations((-154.349438663, 19.635856083)):
            Rectangle(CUT_EXTRUDE_THIN1_OUTLINE_W_5, CUT_EXTRUDE_THIN1_OUTLINE_H_5)
    # profile 13 of 17: a face of its own
    with BuildSketch(Plane(origin=(0, 6, 0), x_dir=(1, 0, 0), z_dir=(0, 1, 0)).offset(CUT_EXTRUDE_THIN1_START)):
        with Locations((88.650568035, 19.635856083)):
            Rectangle(CUT_EXTRUDE_THIN1_OUTLINE_W_5, CUT_EXTRUDE_THIN1_OUTLINE_H_5)
    # profile 14 of 17: a face of its own
    with BuildSketch(Plane(origin=(0, 6, 0), x_dir=(1, 0, 0), z_dir=(0, 1, 0)).offset(CUT_EXTRUDE_THIN1_START)):
        with Locations((7.650565803, 19.635856083)):
            Rectangle(CUT_EXTRUDE_THIN1_OUTLINE_W_4, CUT_EXTRUDE_THIN1_OUTLINE_H_5)
    # profile 15 of 17: a face of its own
    with BuildSketch(Plane(origin=(0, 6, 0), x_dir=(1, 0, 0), z_dir=(0, 1, 0)).offset(CUT_EXTRUDE_THIN1_START)):
        with Locations((-32.849435314, 86.02405051)):
            Rectangle(CUT_EXTRUDE_THIN1_OUTLINE_W_2, CUT_EXTRUDE_THIN1_OUTLINE_H_2)
    # profile 16 of 17: a face of its own
    with BuildSketch(Plane(origin=(0, 6, 0), x_dir=(1, 0, 0), z_dir=(0, 1, 0)).offset(CUT_EXTRUDE_THIN1_START)):
        with Locations((99.763896291, 86.02405051)):
            Rectangle(CUT_EXTRUDE_THIN1_OUTLINE_W_2, CUT_EXTRUDE_THIN1_OUTLINE_H_2)
    # profile 17 of 17: a face of its own
    with BuildSketch(Plane(origin=(0, 6, 0), x_dir=(1, 0, 0), z_dir=(0, 1, 0)).offset(CUT_EXTRUDE_THIN1_START)):
        with Locations((-165.850284133, 86.02405051)):
            Rectangle(CUT_EXTRUDE_THIN1_OUTLINE_W_2, CUT_EXTRUDE_THIN1_OUTLINE_H_2)
    extrude(amount=CUT_EXTRUDE_THIN1_DEPTH, mode=Mode.SUBTRACT)


solid = part.part
